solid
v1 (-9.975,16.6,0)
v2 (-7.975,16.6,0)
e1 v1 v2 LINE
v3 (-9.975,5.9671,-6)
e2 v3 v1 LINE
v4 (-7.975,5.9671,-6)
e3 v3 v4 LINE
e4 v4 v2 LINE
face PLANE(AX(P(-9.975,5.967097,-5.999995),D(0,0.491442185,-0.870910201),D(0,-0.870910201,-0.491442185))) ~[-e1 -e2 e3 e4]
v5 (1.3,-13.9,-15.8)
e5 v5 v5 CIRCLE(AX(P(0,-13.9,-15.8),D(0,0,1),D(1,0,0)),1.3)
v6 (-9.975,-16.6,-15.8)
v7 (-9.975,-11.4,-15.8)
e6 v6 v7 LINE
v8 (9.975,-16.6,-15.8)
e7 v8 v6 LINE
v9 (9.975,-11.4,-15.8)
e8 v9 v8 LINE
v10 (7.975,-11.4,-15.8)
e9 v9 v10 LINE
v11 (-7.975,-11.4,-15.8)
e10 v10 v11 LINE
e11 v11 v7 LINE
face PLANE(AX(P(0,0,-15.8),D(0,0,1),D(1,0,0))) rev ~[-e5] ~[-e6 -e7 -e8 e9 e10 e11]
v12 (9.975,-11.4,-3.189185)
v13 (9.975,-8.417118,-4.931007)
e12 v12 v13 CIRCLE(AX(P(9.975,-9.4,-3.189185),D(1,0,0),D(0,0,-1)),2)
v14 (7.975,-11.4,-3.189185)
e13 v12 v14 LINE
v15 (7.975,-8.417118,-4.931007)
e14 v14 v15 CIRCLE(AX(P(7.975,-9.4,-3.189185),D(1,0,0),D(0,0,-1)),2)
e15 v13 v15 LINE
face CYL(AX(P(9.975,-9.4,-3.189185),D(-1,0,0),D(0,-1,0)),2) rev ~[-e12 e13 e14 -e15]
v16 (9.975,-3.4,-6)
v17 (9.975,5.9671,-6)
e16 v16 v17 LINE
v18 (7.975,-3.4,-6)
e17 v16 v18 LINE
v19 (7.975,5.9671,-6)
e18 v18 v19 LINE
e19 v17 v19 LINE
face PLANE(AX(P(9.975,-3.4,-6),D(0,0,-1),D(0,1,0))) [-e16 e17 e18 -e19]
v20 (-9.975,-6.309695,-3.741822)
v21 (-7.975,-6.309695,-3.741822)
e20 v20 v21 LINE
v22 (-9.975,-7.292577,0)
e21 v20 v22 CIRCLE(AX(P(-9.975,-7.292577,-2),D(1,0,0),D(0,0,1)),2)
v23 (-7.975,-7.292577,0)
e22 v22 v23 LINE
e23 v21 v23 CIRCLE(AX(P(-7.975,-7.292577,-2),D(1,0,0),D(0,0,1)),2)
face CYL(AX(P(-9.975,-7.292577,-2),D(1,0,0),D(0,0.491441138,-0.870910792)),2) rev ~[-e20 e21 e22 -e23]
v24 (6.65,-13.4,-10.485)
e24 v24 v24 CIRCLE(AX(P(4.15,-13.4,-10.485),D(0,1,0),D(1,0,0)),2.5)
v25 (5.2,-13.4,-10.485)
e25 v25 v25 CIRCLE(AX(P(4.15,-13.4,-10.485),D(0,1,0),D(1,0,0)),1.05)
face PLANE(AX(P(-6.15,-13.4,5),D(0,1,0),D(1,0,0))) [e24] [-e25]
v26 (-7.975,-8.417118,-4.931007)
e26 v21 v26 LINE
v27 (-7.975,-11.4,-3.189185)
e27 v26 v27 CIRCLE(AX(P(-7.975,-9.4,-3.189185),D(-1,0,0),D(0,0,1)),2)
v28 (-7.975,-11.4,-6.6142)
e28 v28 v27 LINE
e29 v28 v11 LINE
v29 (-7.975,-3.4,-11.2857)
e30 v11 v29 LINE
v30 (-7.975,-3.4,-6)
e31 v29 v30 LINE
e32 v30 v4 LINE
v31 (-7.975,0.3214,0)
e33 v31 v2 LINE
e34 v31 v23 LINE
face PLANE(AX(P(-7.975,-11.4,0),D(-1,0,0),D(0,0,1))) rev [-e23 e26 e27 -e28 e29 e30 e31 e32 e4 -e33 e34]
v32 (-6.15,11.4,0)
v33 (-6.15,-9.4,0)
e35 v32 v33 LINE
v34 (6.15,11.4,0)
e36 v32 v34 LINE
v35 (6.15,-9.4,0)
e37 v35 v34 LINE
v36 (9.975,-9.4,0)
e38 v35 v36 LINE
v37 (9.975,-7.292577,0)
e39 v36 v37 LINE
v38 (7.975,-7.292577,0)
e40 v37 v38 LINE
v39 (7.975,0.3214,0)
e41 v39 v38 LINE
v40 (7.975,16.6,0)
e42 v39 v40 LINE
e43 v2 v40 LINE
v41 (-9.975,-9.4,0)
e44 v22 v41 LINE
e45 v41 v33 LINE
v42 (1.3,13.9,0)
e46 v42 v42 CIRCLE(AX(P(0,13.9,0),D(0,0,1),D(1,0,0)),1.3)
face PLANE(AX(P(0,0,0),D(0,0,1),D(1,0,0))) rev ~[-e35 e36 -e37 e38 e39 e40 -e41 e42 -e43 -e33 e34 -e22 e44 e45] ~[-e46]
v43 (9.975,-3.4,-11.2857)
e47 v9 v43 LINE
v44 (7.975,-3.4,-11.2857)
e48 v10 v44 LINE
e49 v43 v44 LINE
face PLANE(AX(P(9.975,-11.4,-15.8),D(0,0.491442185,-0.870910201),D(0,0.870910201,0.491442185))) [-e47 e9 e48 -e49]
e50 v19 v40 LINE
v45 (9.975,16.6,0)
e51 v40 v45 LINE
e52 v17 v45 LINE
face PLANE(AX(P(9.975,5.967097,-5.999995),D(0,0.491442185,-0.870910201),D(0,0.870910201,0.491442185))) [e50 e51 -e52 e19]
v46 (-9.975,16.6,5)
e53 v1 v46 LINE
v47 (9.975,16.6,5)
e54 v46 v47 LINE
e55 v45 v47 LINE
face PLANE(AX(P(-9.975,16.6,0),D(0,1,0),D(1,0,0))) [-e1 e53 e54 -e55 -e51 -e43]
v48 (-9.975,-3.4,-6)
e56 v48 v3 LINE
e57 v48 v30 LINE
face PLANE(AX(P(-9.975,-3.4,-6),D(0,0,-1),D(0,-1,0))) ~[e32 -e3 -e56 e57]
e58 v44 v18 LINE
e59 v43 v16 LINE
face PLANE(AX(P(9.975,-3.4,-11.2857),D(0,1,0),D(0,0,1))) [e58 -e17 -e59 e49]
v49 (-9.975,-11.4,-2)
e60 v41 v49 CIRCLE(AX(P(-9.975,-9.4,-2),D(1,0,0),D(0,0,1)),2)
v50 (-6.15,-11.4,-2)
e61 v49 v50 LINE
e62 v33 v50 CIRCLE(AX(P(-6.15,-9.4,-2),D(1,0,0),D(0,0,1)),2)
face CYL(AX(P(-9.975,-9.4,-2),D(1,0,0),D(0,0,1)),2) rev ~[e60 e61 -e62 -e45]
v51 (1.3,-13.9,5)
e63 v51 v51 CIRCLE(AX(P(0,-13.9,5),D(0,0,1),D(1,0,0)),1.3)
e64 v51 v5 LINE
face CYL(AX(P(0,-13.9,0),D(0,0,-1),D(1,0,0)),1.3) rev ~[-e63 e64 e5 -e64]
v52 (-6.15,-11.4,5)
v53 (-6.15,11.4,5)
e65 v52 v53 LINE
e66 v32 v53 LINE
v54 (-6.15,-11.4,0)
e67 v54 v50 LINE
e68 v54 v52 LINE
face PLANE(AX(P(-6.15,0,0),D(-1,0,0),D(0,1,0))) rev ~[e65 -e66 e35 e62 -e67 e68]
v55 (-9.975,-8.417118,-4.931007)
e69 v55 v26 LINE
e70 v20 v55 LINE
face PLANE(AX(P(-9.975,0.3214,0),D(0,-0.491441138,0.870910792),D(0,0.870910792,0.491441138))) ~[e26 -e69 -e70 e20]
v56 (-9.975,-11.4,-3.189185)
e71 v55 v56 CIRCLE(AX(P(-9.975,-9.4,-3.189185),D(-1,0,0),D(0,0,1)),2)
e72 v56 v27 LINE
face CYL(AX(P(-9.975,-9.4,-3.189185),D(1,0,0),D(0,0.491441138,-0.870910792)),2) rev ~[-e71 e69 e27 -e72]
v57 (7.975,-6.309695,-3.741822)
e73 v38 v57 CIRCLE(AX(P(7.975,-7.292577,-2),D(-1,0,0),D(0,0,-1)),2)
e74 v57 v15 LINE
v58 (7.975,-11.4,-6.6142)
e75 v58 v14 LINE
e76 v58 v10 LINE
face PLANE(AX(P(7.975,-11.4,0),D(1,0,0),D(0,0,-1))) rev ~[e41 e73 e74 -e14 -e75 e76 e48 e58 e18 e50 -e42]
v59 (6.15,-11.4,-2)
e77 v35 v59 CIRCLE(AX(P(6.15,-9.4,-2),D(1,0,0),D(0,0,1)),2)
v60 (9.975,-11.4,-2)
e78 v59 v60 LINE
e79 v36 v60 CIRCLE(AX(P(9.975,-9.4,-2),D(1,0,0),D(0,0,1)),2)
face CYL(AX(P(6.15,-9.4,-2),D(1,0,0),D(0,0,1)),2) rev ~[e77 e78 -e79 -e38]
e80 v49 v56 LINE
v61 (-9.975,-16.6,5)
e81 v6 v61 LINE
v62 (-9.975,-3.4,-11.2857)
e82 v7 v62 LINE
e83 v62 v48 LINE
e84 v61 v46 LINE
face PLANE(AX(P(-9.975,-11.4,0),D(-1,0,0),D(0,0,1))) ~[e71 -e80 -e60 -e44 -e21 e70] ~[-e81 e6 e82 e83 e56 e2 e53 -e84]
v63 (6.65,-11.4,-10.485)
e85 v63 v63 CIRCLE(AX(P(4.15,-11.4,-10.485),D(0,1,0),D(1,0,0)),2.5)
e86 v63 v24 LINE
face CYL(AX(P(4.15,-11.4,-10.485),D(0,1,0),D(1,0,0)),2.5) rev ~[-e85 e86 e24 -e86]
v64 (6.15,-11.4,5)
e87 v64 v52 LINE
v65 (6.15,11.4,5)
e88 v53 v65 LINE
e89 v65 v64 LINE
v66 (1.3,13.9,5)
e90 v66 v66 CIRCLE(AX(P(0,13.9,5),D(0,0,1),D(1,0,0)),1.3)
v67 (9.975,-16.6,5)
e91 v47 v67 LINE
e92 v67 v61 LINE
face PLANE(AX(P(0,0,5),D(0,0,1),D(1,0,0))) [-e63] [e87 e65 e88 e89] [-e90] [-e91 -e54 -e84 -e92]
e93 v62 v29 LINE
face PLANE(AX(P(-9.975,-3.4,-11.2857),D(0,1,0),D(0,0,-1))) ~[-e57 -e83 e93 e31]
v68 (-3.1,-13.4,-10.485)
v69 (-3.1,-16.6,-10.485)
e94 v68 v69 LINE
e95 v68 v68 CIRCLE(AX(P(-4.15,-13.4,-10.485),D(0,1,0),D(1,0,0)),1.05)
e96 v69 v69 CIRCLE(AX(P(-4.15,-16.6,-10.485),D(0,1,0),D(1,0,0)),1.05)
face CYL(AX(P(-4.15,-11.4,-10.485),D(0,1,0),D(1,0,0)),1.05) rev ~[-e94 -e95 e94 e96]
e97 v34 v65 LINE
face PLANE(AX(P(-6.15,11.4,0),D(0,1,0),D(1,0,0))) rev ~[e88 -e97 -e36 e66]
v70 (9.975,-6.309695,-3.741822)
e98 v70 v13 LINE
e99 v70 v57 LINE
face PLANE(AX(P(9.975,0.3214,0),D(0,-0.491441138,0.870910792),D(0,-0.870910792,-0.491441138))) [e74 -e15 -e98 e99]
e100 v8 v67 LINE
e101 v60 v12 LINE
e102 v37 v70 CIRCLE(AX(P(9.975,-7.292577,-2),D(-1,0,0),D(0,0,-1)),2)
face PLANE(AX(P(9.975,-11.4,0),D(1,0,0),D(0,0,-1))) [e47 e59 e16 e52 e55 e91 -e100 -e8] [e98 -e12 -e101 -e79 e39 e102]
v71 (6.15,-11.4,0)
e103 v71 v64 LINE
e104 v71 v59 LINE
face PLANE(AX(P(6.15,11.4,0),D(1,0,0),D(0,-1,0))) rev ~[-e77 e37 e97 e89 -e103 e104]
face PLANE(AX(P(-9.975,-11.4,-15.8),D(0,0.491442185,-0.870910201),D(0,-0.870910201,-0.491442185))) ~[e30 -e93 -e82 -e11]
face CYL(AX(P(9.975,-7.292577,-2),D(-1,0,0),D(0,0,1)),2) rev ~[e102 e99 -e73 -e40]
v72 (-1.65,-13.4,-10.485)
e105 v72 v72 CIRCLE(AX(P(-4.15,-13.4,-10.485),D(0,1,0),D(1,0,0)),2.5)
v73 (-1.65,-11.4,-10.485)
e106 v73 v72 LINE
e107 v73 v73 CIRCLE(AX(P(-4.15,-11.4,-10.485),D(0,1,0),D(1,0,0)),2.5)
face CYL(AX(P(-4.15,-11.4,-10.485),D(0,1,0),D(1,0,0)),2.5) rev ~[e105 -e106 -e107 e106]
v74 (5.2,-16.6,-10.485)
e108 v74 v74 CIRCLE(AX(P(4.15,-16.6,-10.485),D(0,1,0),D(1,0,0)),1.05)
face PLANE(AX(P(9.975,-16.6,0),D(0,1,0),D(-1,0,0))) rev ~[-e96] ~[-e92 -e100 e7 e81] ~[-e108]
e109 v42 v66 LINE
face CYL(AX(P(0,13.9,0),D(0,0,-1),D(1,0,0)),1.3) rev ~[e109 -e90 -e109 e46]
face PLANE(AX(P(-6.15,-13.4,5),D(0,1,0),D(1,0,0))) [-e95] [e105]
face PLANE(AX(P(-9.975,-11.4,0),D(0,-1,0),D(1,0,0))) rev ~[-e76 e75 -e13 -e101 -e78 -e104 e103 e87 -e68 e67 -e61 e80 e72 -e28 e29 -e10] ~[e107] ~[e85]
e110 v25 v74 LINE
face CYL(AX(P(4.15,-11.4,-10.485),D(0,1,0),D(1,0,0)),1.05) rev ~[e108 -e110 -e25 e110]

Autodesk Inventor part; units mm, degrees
ref_plane "YZ Plane" through (0, 0, 0) normal (1, 0, 0) x (0, 1, 0)
sketch "Sketch1" plane through (0, 0, 0) normal (0, 0, 1) x (1, 0, 0)
  line L0 (-9.975, 16.6) -> (9.975, 16.6)
  line L1 (9.975, 16.6) -> (9.975, -16.6)
  line L2 (9.975, -16.6) -> (-9.975, -16.6)
  line L3 (-9.975, -16.6) -> (-9.975, 16.6)
  line L4 (0, 0) -> (0, 11.4) construction
  line L5 (0, 0) -> (15.5803, 0) construction
  line L6 (-6.15, 11.4) -> (6.15, 11.4)
  line L7 (6.15, 11.4) -> (6.15, -11.4)
  line L8 (6.15, -11.4) -> (-6.15, -11.4)
  line L9 (-6.15, -11.4) -> (-6.15, 11.4)
  circle A0 centre (0, 13.9) radius 1.3
  circle A1 centre (0, -13.9) radius 1.3
  line L10 (-15.0861, 0) -> (20.6914, 0) projected
  line L11 (9.975, -16.6) -> (-9.975, -16.6)
  line L12 (-9.975, -16.6) -> (-9.975, -11.4)
  line L13 (-9.975, -11.4) -> (9.975, -11.4)
  line L14 (9.975, -11.4) -> (9.975, -16.6)
  line L15 (0, 11.4) -> (0, 13.9) construction
  point P0 (0, 16.6)
  dimension "d0" = 2.6
  dimension "d1" = 27.8
  dimension "d4" = 12.3
  dimension "d5" = 2.5
  dimension "d6" = 2.5
  dimension "d7" = 22.8
  dimension "d11" = 2.7
  dimension "d12" = 2.7
  dimension "d14" = 3.825
extrude "Extrusion1" add sketch "Sketch1" along normal blind 5 contours L0 L1 L10 L7 L6 L9 L3 | L10 L9 L13 L3 | L1 L13 L7 L10 | L13 L8 L1 L2 L3
extrude "Extrusion2" add sketch "Sketch1" against normal blind 15.8 contours L13 L8 L1 L2 L3
sketch "Sketch2" plane through (-6.15, -11.4, 5) normal (0, 1, 0) x (1, 0, 0)
  circle A0 centre (10.3, 15.485) radius 1.05
  circle A1 centre (2, 15.485) radius 1.05
  line L0 (-3.825, 20.8) -> (16.125, 20.8) projected
  line L1 (-3.825, 5) -> (-3.825, 20.8) projected
  line L2 (2, 15.485) -> (10.3, 15.485) construction
  line L3 (10.3, 15.485) -> (6.15, 15.485) construction
  line L4 (6.15, 15.485) -> (6.15, 20.8) construction
  point P0 (6.15, 5)
  dimension "d19" = 2.1
  dimension "d20" = 0
  dimension "d21" = 5.315
  dimension "d22" = 8.3
extrude "Extrusion3" cut sketch "Sketch2" against normal blind 10
sketch "Sketch3" plane through (-6.15, -11.4, 5) normal (0, 1, 0) x (1, 0, 0)
  circle A0 centre (10.3, 15.485) radius 1.05 projected
  circle A1 centre (10.3, 15.485) radius 2.5
  circle A2 centre (2, 15.485) radius 1.05 projected
  circle A3 centre (2, 15.485) radius 2.5
  point P0 (6.15, 5)
  dimension "d26" = 5
extrude "Extrusion4" cut sketch "Sketch3" against normal blind 2
sketch "Sketch4" plane through (9.975, -11.4, 0) normal (1, 0, 0) x (0, 0, -1)
  line L0 (0, 0) -> (15.8, 0) projected
  line L1 (0, 0) -> (0, 28) projected
  line L2 (15.8, 0) -> (0, 28)
  line L3 (0, 28) -> (0, 11.7214)
  line L4 (0, 11.7214) -> (6.6142, 0)
  line L5 (6.6142, 0) -> (15.8, 0)
  line L6 (0, 28) -> (-5, 28) projected
  line L7 (0, 11.7214) -> (0, 28)
  line L8 (6, 17.3671) -> (11.2857, 17.3671)
  line L9 (11.2857, 17.3671) -> (11.2857, 8)
  line L10 (11.2857, 8) -> (6, 8)
  line L11 (6, 8) -> (6, 17.3671)
  point P0 (0, 11.4)
  dimension "d29" = 8
  dimension "d33" = 8
  dimension "d34" = 6
ref_plane "Work Plane1" through (-1.325, -11.4, 0) normal (-1, 0, 0) x (0, 0, 1)
extrude "Extrusion5" add sketch "Sketch4" against normal blind 2 contours L4 L1 L2 L11 L10 L0
ref_plane "Work Plane3" through (0, -16.6, 5) normal (-1, 0, 0) x (0, 0, 1)
mirror "Mirror1" about plane through (0, -16.6, 5) normal (-1, 0, 0) of "Extrusion5"
fillet "Fillet1" radius 2 6 edges at (8.975, 0.3214, 0) (8.975, -11.4, -6.6142) (8.0625, -11.4, 0) (-8.975, -11.4, -6.6142) (-8.0625, -11.4, 0) (-8.975, 0.3214, 0)
properties part number "GrabberServoHolder_3DPrint"
